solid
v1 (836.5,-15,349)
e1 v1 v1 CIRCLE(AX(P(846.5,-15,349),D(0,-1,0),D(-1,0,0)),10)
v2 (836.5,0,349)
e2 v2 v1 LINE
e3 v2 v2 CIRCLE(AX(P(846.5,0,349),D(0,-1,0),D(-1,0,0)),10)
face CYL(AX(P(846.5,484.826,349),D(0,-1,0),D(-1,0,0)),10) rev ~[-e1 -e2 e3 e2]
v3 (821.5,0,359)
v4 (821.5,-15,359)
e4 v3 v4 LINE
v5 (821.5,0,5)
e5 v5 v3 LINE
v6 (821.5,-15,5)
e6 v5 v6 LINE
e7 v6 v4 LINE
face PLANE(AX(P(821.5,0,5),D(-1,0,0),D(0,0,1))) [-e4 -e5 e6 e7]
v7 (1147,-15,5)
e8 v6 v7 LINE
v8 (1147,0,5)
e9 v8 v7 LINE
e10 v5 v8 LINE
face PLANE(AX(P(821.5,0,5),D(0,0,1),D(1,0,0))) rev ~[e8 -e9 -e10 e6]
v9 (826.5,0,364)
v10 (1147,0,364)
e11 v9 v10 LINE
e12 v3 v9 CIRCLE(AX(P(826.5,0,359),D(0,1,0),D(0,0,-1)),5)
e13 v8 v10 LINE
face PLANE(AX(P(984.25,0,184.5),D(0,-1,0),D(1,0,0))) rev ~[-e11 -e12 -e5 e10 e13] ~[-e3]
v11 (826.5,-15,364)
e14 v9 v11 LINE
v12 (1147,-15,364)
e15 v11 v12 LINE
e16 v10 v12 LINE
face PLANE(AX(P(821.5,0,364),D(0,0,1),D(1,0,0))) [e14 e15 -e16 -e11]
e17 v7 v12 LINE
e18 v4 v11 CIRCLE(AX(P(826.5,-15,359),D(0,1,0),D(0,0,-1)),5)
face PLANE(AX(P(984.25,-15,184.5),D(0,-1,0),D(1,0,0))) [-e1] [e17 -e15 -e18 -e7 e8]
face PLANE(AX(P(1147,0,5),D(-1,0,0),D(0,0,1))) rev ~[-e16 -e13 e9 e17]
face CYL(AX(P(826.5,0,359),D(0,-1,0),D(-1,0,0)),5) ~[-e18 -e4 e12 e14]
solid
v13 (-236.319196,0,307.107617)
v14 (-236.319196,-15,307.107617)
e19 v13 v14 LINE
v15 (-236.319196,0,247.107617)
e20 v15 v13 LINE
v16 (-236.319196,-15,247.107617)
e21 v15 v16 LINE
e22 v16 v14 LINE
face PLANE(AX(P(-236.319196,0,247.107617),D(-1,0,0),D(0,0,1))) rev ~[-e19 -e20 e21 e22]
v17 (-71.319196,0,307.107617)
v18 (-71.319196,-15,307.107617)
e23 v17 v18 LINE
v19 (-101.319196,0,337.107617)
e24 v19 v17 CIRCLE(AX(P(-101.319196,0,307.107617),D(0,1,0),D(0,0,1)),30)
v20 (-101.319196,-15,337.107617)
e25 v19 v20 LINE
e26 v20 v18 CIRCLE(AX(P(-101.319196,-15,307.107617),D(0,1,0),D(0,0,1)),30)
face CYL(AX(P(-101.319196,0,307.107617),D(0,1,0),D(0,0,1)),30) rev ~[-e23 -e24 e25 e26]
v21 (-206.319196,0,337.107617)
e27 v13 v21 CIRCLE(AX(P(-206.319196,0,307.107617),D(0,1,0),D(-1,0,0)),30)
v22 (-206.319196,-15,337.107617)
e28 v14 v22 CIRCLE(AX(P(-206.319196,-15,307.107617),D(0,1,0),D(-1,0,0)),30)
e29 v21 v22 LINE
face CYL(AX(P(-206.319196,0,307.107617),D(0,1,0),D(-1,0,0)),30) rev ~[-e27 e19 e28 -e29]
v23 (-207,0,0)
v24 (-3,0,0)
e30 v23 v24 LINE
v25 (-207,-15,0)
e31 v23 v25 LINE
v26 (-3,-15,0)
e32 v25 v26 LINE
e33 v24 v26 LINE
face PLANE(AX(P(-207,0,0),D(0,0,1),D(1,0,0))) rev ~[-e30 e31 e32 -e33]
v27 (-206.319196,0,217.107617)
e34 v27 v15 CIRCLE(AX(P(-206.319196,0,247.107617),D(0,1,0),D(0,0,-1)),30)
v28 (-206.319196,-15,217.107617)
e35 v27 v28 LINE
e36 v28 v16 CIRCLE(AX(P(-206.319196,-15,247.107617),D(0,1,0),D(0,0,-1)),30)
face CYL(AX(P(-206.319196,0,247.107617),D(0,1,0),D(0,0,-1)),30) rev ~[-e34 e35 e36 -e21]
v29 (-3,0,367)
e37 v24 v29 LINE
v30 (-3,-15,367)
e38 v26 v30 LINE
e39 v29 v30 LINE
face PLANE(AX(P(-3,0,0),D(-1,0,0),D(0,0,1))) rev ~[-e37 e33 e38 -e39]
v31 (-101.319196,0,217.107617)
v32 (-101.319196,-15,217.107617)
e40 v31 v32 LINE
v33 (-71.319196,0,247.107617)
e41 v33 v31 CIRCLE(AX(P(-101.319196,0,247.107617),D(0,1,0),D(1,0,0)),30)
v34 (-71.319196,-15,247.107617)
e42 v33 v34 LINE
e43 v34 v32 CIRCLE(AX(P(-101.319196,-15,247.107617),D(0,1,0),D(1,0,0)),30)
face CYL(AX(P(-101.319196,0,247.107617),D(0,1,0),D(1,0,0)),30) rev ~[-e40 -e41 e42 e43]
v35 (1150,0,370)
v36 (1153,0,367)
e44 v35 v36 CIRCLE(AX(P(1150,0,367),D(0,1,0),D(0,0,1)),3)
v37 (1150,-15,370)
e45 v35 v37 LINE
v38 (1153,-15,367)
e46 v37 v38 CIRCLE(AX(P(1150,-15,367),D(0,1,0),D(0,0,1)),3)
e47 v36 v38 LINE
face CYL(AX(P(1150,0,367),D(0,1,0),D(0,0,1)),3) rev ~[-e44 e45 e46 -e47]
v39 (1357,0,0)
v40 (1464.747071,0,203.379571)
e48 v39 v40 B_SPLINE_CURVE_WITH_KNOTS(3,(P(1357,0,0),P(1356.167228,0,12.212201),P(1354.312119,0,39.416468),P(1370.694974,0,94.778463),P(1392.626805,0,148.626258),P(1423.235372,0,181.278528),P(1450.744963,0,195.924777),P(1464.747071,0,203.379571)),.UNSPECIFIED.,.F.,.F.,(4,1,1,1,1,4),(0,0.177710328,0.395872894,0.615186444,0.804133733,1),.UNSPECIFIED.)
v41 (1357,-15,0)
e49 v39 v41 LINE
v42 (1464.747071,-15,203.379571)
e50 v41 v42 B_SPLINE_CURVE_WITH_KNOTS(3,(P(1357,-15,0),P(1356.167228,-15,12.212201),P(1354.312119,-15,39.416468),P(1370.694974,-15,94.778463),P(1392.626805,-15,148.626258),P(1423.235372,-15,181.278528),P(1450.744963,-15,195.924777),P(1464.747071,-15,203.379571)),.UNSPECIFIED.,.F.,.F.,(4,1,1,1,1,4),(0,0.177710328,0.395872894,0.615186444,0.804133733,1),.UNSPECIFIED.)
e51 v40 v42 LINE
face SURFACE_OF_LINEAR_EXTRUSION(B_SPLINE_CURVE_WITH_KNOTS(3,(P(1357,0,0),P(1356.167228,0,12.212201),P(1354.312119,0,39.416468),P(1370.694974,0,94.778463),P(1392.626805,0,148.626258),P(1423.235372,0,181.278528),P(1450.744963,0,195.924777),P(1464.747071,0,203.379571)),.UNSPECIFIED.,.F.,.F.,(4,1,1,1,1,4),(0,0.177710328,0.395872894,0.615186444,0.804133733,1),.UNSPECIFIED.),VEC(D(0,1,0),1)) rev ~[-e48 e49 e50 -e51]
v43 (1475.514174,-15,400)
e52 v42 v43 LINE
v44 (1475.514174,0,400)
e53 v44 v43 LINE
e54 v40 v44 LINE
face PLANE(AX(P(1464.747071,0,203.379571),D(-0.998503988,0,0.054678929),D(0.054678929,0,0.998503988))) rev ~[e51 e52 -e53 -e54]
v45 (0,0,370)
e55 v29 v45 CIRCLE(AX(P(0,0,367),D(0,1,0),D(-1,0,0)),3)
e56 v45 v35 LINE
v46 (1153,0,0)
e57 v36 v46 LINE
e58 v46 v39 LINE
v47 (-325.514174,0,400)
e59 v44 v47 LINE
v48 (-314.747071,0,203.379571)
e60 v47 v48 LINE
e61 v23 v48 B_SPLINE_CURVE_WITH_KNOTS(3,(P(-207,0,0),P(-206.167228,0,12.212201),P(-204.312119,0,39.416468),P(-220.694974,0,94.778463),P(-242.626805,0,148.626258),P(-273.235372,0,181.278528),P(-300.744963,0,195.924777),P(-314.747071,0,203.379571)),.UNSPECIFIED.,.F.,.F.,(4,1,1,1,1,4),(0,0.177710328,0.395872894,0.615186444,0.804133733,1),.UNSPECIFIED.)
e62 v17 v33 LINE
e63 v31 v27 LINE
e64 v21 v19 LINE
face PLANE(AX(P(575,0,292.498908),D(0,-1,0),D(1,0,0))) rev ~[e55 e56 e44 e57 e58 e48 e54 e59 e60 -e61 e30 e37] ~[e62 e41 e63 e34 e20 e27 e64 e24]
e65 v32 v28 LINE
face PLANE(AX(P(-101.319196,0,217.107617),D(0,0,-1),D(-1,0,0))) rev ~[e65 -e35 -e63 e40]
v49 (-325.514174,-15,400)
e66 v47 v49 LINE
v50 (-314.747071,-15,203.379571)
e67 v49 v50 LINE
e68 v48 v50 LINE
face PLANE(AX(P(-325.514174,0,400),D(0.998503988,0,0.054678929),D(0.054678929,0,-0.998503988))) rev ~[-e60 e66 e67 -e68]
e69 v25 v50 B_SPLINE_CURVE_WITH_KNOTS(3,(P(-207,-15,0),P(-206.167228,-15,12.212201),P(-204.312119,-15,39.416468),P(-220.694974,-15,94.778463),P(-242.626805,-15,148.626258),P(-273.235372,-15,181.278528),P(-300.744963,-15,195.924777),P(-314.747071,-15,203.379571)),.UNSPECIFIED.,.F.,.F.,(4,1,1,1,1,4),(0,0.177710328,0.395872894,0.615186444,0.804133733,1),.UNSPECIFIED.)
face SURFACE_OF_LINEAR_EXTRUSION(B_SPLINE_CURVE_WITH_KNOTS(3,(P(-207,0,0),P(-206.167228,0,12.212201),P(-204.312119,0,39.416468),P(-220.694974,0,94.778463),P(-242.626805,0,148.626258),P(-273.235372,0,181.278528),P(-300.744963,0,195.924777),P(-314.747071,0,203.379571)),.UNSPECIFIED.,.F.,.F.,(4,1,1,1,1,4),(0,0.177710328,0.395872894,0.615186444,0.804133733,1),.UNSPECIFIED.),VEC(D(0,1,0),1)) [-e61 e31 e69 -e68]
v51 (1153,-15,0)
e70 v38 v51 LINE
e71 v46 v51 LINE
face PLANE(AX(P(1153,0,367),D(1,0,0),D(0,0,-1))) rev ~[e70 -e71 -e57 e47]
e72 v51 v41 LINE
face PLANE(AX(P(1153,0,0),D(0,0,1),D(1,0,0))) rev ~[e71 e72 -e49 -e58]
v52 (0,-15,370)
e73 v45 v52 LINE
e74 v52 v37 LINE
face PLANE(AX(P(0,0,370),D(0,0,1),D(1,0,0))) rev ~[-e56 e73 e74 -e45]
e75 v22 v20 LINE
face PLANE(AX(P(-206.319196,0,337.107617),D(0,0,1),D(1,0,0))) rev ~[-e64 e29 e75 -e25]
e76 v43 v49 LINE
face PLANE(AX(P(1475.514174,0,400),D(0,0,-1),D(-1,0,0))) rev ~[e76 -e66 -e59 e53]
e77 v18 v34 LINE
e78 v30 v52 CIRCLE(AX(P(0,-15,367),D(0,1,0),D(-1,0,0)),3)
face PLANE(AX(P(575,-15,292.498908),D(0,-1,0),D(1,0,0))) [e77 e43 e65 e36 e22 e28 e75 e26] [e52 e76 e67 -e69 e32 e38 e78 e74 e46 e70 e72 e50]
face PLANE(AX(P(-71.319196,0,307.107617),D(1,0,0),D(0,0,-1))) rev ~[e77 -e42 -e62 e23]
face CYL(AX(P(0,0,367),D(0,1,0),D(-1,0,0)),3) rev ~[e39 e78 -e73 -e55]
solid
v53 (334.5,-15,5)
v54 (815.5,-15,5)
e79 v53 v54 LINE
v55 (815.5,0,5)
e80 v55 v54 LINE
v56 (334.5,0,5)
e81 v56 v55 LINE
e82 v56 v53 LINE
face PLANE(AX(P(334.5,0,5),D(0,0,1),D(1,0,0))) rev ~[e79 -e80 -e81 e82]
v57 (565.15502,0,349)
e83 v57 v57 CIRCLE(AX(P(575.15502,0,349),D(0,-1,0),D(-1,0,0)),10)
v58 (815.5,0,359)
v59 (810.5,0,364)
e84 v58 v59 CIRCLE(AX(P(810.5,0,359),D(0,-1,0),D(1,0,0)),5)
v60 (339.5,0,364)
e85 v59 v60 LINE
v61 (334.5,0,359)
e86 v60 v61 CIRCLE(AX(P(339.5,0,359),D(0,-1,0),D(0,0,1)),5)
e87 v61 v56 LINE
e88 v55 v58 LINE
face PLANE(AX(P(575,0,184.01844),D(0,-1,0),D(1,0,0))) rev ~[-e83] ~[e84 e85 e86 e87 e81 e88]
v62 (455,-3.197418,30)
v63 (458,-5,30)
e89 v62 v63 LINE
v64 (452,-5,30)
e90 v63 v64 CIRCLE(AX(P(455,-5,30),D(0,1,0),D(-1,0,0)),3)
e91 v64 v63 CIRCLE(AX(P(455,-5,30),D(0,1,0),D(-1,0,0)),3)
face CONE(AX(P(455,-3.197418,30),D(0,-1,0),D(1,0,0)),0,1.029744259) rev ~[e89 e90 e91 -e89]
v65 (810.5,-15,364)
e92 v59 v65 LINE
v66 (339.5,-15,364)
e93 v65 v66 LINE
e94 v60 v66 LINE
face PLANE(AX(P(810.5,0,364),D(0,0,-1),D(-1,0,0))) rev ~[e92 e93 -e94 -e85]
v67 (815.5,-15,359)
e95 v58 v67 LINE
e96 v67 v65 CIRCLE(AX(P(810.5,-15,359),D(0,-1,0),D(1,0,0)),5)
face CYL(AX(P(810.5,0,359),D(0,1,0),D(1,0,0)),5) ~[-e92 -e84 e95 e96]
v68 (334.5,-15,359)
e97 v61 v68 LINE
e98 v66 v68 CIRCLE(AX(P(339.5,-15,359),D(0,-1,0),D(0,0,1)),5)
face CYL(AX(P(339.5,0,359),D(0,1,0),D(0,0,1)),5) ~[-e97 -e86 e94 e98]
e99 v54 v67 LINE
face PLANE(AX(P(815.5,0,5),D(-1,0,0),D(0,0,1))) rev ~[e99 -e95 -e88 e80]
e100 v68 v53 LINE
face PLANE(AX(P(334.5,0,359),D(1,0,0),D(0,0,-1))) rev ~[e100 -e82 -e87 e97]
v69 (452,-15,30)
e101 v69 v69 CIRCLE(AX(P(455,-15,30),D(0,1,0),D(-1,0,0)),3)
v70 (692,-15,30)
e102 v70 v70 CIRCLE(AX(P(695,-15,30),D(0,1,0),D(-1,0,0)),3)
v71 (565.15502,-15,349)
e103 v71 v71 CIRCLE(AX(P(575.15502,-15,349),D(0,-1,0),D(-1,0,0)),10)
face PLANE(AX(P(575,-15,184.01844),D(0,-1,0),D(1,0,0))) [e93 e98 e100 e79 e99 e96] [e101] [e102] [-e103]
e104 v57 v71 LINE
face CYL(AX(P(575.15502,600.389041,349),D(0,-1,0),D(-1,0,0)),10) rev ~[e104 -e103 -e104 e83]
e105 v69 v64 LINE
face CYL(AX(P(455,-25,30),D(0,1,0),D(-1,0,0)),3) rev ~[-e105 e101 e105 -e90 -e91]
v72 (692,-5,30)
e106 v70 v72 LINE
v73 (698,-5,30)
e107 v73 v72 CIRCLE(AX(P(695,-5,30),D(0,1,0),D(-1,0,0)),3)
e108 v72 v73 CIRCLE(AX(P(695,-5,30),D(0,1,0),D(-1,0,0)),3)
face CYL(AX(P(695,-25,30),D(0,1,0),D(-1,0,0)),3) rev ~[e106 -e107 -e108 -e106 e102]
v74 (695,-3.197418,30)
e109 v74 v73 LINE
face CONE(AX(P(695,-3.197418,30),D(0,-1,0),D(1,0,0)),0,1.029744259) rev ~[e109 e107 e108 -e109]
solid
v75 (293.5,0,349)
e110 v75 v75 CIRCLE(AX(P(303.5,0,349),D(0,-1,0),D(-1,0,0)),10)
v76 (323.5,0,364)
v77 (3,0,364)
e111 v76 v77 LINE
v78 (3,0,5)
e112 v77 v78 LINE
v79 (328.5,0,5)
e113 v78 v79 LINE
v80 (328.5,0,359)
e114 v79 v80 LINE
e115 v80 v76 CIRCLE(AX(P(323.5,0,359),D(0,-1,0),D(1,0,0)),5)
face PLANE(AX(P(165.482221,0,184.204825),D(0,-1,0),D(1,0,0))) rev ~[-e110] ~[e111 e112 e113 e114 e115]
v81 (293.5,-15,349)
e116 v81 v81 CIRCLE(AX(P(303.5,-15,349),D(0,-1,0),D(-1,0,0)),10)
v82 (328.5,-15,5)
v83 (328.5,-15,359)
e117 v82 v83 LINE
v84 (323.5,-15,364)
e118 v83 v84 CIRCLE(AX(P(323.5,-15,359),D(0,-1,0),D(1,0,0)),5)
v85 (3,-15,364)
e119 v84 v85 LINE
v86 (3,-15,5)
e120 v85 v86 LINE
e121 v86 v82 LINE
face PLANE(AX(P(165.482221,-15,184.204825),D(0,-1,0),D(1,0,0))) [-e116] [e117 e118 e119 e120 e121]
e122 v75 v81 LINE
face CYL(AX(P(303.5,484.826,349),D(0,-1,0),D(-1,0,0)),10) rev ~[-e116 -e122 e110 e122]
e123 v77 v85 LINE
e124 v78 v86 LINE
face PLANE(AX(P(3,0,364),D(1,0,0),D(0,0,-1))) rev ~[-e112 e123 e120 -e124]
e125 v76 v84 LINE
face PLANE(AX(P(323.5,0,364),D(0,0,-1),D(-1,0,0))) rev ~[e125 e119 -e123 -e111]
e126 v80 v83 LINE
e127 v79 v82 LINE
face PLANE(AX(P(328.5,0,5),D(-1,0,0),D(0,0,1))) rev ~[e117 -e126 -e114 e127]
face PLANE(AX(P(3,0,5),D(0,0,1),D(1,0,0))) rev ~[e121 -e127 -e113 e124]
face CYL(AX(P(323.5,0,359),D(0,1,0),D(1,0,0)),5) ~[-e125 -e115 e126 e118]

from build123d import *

# Parameters (mm, degrees)
F1_DEPTH = 15
F0_W     = 325.5
F0_H     = 359
F3_D     = 20
F3_2_D   = 20
F4_D     = 20
F6_D     = 6
F6_DEPTH = 10
F6_TIP   = 1.8025818571
F7_R     = 5


# Not quite as in the source:
# - a feature names something its author has since deleted; it is built from what else it names


with BuildPart() as f1:
    # F0 (on Front) → F1 (new body)
    with BuildSketch(Plane.XZ):
        with BuildLine():
            Line((323.5, 364), (3, 364))
            Line((3, 364), (3, 5))
            Line((3, 5), (328.5, 5))
            Line((328.5, 5), (328.5, 359))
            ThreePointArc((328.5, 359), (327.0355339059, 362.5355339059), (323.5, 364))
        make_face()
    extrude(amount=F1_DEPTH)

    # F3 (through all)
    with Locations(Plane(origin=(0, 0, 0), x_dir=(1, 0, 0), z_dir=(0, 1, 0))):
        with Locations((846.5, -349), (303.5, -349)):
            Hole(F3_D / 2)


with BuildPart() as f1b:
    # F0 (on Front) → F1, piece 2 (new body)
    with BuildSketch(Plane.XZ):
        with BuildLine():
            Line((1153, 367), (1153, 0))
            Line((1153, 0), (1357, 0))
            add(Edge.make_bspline(
                [(1357, 0), (1356.1672278551, 12.2122007475), (1354.31211947, 39.4164680214), (1370.6949740653, 94.7784632641), (1392.6268048722, 148.6262577603), (1423.2353721262, 181.2785277748), (1450.7449633607, 195.9247766546), (1464.7470712662, 203.3795714378)],
                knots=[0, 0, 0, 0, 0.1777103276, 0.3958728938, 0.6151864439, 0.8041337332, 1, 1, 1, 1], degree=3))
            Line((1464.7470712662, 203.3795714378), (1475.5141735077, 400))
            Line((1475.5141735077, 400), (575, 400))
            Line((575, 400), (-325.5141735077, 400))
            Line((-325.5141735077, 400), (-314.7470712662, 203.3795714378))
            add(Edge.make_bspline(
                [(-207, 0), (-206.1672278551, 12.2122007475), (-204.31211947, 39.4164680214), (-220.6949740653, 94.7784632641), (-242.6268048722, 148.6262577603), (-273.2353721262, 181.2785277748), (-300.7449633607, 195.9247766546), (-314.7470712662, 203.3795714378)],
                knots=[0, 0, 0, 0, 0.1777103276, 0.3958728938, 0.6151864439, 0.8041337332, 1, 1, 1, 1], degree=3))
            Line((-207, 0), (-3, 0))
            Line((-3, 0), (-3, 367))
            ThreePointArc((-3, 367), (-2.1213203436, 369.1213203436), (0, 370))
            Line((0, 370), (1150, 370))
            ThreePointArc((1150, 370), (1152.1213203436, 369.1213203436), (1153, 367))
        make_face()
        with BuildLine():
            Line((-206.3191956282, 337.107616663), (-101.3191956282, 337.107616663))
            ThreePointArc((-101.3191956282, 337.107616663), (-80.1059921926, 328.3208200986), (-71.3191956282, 307.107616663))
            Line((-71.3191956282, 307.107616663), (-71.3191956282, 247.107616663))
            ThreePointArc((-71.3191956282, 247.107616663), (-80.1059921926, 225.8944132274), (-101.3191956282, 217.107616663))
            Line((-101.3191956282, 217.107616663), (-206.3191956282, 217.107616663))
            ThreePointArc((-206.3191956282, 217.107616663), (-227.5323990638, 225.8944132274), (-236.3191956282, 247.107616663))
            Line((-236.3191956282, 247.107616663), (-236.3191956282, 307.107616663))
            ThreePointArc((-236.3191956282, 307.107616663), (-227.5323990638, 328.3208200986), (-206.3191956282, 337.107616663))
        make_face(mode=Mode.SUBTRACT)
    extrude(amount=F1_DEPTH)


with BuildPart() as f1c:
    # F0 (on Front) → F1, piece 3 (new body)
    with BuildSketch(Plane.XZ):
        with Locations((984.25, 184.5)):
            Rectangle(F0_W, F0_H)
    extrude(amount=F1_DEPTH)

    # F3#2 (through all)
    with Locations(Plane(origin=(0, 0, 0), x_dir=(1, 0, 0), z_dir=(0, 1, 0))):
        with Locations((846.5, -349), (303.5, -349)):
            Hole(F3_2_D / 2)

    # F7
    f7_edges = [f1c.edges().sort_by_distance(p)[0] for p in [
        (821.5, -7.5, 364),
    ]]
    fillet(f7_edges, radius=F7_R)


with BuildPart() as f1d:
    # F0 (on Front) → F1, piece 4 (new body)
    with BuildSketch(Plane.XZ):
        with BuildLine():
            Line((334.5, 359), (334.5, 5))
            Line((334.5, 5), (815.5, 5))
            Line((815.5, 5), (815.5, 359))
            ThreePointArc((815.5, 359), (814.0355339059, 362.5355339059), (810.5, 364))
            Line((810.5, 364), (339.5, 364))
            ThreePointArc((339.5, 364), (335.9644660941, 362.5355339059), (334.5, 359))
        make_face()
    extrude(amount=F1_DEPTH)

    # F4 (through all)
    with Locations(Plane(origin=(0, 0, 0), x_dir=(1, 0, 0), z_dir=(0, 1, 0))):
        with Locations((575.1550197601, -349)):
            Hole(F4_D / 2)

    # F6
    with Locations(Plane.XZ.offset(15)):
        with Locations((455, 30), (695, 30)):
            Hole(F6_D / 2, depth=F6_DEPTH)
            with Locations((0, 0, -(F6_DEPTH + F6_TIP / 2))):  # 118° drill point
                Cone(0, F6_D / 2, F6_TIP, mode=Mode.SUBTRACT)


solid = Compound([f1.part, f1b.part, f1c.part, f1d.part])
